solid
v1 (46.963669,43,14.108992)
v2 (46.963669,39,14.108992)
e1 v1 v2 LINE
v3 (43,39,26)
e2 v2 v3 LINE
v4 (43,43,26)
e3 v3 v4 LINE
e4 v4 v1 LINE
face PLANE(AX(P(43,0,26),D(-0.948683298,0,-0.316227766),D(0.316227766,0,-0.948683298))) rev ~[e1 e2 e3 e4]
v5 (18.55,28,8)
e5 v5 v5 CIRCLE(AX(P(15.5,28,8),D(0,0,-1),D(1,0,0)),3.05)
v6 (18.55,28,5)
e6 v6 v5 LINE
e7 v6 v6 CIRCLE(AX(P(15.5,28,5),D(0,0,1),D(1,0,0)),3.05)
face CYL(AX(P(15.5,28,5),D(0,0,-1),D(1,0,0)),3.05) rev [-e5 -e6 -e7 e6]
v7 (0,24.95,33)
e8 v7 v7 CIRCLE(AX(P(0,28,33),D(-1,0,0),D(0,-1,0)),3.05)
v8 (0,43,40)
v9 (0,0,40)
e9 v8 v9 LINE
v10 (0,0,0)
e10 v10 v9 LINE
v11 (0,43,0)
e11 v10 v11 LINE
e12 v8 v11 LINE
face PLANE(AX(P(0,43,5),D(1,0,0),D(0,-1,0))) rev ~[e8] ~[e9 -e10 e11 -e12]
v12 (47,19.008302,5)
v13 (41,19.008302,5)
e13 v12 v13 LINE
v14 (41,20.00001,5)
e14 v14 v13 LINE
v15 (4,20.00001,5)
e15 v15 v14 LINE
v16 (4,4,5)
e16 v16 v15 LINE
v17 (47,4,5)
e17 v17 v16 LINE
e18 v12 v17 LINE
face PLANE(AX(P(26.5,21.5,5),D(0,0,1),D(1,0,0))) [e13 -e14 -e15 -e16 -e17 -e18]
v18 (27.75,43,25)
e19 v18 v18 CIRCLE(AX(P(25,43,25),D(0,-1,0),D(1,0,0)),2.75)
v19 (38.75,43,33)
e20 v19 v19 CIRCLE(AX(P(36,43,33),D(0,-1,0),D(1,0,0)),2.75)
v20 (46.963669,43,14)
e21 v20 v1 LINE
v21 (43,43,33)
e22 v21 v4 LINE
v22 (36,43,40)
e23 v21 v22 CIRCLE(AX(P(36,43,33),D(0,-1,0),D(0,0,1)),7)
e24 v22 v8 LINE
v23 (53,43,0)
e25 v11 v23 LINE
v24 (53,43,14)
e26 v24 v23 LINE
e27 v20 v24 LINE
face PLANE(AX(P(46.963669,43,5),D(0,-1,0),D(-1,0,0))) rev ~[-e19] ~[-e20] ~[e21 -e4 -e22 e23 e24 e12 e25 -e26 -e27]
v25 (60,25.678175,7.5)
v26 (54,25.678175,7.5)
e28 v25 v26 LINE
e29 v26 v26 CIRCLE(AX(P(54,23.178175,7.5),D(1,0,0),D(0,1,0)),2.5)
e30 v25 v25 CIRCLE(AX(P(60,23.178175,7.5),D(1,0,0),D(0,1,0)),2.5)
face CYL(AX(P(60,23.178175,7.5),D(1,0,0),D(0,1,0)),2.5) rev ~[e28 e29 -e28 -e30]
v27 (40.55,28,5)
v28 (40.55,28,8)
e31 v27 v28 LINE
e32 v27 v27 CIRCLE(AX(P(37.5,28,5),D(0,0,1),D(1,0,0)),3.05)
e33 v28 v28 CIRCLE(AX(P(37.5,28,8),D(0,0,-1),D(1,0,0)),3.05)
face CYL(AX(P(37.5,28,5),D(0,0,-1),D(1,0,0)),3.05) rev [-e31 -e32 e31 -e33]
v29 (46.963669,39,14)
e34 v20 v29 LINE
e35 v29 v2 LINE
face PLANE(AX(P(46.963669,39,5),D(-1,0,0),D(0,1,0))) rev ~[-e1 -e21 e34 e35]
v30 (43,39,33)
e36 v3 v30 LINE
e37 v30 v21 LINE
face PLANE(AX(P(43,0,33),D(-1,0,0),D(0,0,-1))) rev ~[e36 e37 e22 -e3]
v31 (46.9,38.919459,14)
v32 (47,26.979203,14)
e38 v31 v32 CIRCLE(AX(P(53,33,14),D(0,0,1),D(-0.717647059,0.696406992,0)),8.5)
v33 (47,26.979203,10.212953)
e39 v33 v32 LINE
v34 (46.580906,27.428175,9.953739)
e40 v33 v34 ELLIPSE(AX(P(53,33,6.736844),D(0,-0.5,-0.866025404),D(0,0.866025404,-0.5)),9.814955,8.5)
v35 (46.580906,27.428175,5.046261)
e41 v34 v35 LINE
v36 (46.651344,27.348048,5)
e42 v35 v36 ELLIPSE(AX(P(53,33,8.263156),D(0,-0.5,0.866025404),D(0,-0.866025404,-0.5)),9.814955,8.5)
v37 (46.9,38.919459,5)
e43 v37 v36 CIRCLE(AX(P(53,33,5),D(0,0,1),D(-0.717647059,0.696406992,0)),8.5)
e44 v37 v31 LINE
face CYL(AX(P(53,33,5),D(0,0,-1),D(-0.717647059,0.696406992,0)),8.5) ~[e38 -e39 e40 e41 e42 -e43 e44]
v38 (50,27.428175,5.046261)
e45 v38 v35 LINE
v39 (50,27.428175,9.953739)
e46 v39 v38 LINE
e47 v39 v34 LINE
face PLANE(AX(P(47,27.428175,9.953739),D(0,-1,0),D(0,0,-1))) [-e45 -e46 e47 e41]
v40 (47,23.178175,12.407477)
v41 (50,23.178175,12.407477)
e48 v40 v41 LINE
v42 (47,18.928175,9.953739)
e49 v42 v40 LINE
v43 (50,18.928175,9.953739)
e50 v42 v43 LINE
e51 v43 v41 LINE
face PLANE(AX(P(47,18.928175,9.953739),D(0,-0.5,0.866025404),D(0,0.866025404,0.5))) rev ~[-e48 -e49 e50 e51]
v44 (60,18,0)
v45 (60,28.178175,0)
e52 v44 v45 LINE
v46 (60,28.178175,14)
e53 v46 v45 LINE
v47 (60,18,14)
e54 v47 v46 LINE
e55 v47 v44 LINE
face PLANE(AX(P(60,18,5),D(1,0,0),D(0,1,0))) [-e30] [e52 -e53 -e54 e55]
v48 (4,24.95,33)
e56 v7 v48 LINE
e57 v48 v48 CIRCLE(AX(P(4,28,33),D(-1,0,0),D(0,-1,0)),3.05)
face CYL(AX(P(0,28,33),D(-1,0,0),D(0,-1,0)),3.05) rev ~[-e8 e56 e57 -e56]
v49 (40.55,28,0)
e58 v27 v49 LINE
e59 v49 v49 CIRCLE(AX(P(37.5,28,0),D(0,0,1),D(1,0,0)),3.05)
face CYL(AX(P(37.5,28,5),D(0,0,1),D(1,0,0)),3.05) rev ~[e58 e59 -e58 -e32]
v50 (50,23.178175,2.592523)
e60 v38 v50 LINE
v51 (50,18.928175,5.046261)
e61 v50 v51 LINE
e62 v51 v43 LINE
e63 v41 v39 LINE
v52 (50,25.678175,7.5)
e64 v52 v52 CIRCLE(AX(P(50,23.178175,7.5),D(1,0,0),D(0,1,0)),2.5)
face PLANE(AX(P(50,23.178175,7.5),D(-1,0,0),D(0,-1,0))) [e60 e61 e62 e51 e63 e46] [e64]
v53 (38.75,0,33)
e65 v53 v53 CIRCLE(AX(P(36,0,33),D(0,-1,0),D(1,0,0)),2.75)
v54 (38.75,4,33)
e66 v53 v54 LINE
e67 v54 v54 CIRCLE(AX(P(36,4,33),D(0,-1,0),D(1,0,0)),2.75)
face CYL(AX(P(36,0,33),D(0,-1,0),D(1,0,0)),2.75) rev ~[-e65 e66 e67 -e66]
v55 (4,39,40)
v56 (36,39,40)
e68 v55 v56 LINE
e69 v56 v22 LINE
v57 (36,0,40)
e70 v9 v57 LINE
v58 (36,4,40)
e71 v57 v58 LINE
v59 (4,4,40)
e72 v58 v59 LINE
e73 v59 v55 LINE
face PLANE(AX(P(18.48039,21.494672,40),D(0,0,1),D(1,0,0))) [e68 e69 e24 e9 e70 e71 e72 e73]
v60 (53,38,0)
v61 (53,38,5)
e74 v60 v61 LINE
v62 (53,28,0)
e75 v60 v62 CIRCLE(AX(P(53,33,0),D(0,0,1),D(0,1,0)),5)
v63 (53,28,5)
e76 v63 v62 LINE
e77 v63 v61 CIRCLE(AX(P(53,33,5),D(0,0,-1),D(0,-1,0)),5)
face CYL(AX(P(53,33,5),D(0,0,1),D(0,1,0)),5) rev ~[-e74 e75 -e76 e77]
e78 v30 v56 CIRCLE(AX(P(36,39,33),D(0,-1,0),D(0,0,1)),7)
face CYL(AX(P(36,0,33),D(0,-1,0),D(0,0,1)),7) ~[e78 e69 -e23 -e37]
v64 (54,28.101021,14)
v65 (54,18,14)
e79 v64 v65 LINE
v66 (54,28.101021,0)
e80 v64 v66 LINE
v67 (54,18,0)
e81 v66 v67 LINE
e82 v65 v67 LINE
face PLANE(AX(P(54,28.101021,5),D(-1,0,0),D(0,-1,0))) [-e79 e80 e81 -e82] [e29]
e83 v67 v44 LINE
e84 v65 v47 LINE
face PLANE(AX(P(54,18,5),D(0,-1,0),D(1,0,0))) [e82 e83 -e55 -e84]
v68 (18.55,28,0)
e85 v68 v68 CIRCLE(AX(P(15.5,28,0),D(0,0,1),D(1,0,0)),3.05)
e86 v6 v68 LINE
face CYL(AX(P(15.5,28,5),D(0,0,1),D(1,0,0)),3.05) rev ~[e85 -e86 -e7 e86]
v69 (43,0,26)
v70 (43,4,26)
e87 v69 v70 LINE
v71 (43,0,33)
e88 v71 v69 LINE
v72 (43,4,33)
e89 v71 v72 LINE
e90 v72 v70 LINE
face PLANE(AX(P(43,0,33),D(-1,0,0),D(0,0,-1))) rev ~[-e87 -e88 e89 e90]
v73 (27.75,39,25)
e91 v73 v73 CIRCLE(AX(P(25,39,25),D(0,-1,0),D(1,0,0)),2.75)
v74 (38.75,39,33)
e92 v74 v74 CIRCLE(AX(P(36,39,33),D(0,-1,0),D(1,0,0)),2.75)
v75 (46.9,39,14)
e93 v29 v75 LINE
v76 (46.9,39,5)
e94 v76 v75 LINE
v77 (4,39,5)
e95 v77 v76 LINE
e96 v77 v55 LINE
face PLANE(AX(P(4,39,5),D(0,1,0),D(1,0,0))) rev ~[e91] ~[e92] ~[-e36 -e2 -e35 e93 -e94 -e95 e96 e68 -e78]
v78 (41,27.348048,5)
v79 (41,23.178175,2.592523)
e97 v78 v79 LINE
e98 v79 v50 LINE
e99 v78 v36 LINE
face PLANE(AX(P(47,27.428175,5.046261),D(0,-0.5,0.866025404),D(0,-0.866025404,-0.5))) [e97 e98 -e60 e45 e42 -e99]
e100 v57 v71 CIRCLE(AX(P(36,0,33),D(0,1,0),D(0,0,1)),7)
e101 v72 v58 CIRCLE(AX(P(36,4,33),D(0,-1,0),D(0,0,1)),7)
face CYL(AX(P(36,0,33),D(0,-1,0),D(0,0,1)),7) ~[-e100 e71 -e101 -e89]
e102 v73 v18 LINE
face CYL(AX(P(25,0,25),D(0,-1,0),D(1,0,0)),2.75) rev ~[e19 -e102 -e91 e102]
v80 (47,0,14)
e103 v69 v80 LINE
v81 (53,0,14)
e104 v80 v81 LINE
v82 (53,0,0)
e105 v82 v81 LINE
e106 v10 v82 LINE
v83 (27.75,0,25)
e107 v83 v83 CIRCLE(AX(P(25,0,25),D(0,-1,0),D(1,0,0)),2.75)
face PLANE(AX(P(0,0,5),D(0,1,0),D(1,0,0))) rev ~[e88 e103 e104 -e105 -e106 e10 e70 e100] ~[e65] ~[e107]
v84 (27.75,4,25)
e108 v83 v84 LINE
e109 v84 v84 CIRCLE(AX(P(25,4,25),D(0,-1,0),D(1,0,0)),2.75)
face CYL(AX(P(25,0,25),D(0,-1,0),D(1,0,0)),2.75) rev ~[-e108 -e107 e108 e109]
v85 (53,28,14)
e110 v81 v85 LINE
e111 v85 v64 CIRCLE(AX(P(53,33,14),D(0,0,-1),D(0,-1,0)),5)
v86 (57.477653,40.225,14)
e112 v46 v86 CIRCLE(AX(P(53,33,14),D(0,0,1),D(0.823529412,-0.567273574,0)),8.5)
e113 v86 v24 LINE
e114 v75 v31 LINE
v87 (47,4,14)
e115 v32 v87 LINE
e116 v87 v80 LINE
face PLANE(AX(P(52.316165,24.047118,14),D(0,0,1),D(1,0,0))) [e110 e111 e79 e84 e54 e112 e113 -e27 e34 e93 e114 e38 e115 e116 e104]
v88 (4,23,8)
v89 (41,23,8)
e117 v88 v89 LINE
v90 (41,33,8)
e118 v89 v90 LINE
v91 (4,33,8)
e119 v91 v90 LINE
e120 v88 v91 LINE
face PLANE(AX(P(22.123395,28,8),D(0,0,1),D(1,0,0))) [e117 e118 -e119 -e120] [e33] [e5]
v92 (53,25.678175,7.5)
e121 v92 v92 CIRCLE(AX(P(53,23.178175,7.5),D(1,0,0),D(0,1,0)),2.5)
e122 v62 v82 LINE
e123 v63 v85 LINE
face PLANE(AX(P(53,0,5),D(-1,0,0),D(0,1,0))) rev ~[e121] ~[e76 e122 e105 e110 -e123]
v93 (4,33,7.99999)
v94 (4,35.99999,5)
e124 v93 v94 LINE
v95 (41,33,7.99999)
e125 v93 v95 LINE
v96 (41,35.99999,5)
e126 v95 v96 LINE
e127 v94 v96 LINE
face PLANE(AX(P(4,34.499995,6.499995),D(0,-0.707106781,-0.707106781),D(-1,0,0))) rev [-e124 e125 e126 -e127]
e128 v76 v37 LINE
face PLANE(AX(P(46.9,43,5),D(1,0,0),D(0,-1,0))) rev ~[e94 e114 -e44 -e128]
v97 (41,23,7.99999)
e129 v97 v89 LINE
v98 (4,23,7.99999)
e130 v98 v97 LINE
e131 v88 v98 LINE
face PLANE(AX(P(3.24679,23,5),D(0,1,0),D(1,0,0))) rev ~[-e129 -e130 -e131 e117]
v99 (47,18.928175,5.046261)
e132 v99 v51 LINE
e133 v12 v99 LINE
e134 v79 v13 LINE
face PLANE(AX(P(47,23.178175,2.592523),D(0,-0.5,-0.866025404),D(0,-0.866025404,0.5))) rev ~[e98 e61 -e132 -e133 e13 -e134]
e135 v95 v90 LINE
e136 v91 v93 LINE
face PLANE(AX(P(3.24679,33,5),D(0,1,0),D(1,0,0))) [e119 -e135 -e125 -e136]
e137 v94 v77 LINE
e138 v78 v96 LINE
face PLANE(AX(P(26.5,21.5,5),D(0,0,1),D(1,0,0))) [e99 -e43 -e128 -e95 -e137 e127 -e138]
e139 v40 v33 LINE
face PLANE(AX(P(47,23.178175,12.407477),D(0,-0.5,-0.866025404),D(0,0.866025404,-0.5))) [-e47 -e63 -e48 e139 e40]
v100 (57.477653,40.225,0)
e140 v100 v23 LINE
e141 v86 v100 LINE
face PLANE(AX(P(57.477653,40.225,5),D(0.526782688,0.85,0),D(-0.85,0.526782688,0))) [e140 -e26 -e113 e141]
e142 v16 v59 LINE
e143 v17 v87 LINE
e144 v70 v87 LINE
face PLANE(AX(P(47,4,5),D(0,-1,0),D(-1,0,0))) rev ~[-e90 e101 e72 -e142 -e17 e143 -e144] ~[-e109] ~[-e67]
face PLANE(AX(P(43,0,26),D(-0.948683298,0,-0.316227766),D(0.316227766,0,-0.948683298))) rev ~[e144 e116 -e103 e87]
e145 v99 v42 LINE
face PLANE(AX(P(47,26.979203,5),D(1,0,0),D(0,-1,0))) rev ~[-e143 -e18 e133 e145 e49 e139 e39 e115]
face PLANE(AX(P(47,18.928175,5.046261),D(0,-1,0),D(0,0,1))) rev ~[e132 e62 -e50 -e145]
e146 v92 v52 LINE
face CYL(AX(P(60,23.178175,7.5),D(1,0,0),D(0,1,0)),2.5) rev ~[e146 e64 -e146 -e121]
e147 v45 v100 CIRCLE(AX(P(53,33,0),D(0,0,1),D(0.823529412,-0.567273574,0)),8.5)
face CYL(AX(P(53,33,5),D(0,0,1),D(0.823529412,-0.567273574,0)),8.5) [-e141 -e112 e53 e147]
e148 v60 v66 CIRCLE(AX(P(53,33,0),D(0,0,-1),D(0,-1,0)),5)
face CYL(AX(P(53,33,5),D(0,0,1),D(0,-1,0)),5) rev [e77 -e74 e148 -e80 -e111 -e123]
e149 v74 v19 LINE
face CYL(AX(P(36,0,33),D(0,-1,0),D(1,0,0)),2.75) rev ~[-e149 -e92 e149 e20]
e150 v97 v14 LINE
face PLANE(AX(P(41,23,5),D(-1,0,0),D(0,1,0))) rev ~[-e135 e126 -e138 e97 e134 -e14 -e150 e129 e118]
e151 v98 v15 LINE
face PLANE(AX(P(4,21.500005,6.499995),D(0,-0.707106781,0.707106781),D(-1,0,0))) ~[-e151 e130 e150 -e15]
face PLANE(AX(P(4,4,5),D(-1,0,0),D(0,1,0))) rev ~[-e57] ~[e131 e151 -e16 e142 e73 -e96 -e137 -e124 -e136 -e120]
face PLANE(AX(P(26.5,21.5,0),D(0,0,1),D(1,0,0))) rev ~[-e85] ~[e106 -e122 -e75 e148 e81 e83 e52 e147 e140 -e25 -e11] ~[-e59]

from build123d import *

# Parameters (mm, degrees)
F0_W           = 53
F0_H           = 43
F1_DEPTH       = 5
F3_DEPTH       = 9
F3_DEPTH_BACK  = 5
F4_DEPTH       = 25
F6_DEPTH       = 35
F7_R           = 2.75
F8_DEPTH       = 43.001
F10_DEPTH      = 3
F10_DEPTH_BACK = 6
F11_R          = 2.5
F12_DEPTH      = 25
F13_W          = 37.7532099868
F13_H          = 10
F14_DEPTH      = 3
F15_R          = 3.05
F16_DEPTH      = 25
F16_DEPTH_BACK = 25
F17_SIZE       = 2.99999
F18_R          = 3.05
F19_DEPTH      = 25


# Not quite as in the source:
# - a fillet or chamfer is up to 0.001 mm smaller than in the source, because OpenCascade refuses the exact size


with BuildPart() as f1:
    # F0 (on Top) → F1 (new body)
    with BuildSketch(Plane.XY):
        with Locations((26.5, 21.5)):
            Rectangle(F0_W, F0_H)
    extrude(amount=F1_DEPTH)

    # F2 (on face) → F3 (join, two sides)
    with BuildSketch(Plane.XY.offset(5)) as f3_sk:
        with BuildLine():
            Line((47, 0), (53, 0))
            Line((53, 0), (53, 24.5))
            Line((53, 24.5), (53, 28))
            ThreePointArc((53, 28), (52.49745519, 37.974680765), (54, 28.1010205144))
            Line((54, 28.1010205144), (54, 24.5590284919))
            Line((54, 24.5590284919), (54, 18))
            Line((54, 18), (60, 18))
            Line((60, 18), (60, 25.8046761155))
            Line((60, 25.8046761155), (60, 28.1781746195))
            ThreePointArc((60, 28.1781746195), (61.3195930877, 34.7419445616), (57.477652845, 40.225))
            Line((57.477652845, 40.225), (53, 43))
            Line((53, 43), (47, 43))
            Line((47, 43), (46.9, 43))
            Line((46.9, 43), (46.9, 38.9194594348))
            ThreePointArc((46.9, 38.9194594348), (44.5002980841, 32.9288147474), (47, 26.9792027106))
            Line((47, 26.9792027106), (47, 0))
        make_face()
    extrude(amount=F3_DEPTH)
    extrude(f3_sk.sketch, amount=-F3_DEPTH_BACK)

    # F2 (on face) → F4 (cut)
    with BuildSketch(Plane.XY.offset(5)):
        with BuildLine():
            ThreePointArc((53, 38), (48, 33), (53, 28))
            Line((53, 28), (53, 28.1010205144))
            Line((53, 28.1010205144), (53, 38))
        make_face()
    extrude(amount=-F4_DEPTH, mode=Mode.SUBTRACT)

    # F5 (on face) → F6 (join)
    with BuildSketch(Plane.XY.offset(5)):
        Polygon((0, 43), (0, 0), (47, 0), (47, 4.00000019), (4.00000019, 4.00000019), (4.00000019, 38.99999981), (46.9636693597, 38.99999981), (46.9636693597, 43), align=None)
    extrude(amount=F6_DEPTH)

    # F7 (on face) → F8 (cut, through all)
    with BuildSketch(Plane.XZ):
        with Locations((36, 33)):
            Circle(F7_R)
        with Locations((25, 25)):
            Circle(F7_R)
        with BuildLine():
            ThreePointArc((36, 40), (40.9497474683, 37.9497474683), (43, 33))
            Line((43, 33), (43, 26))
            Line((43, 26), (47, 14))
            Line((47, 14), (47, 40))
            Line((47, 40), (36, 40))
        make_face()
    extrude(amount=-F8_DEPTH, mode=Mode.SUBTRACT)

    # F9 (on face) → F10 (cut, two sides)
    with BuildSketch(Plane(origin=(47, 0, 0), x_dir=(0, -1, 0), z_dir=(-1, 0, 0))) as f10_sk:
        Polygon((-18.9281746195, 5.0462613559), (-18.9281746195, 9.9537386441), (-23.1781746195, 12.4074772881), (-27.4281746195, 9.9537386441), (-27.4281746195, 5.0462613559), (-23.1781746195, 2.5925227119), align=None)
    extrude(amount=-F10_DEPTH, mode=Mode.SUBTRACT)
    extrude(f10_sk.sketch, amount=F10_DEPTH_BACK, mode=Mode.SUBTRACT)

    # F11 (on face) → F12 (cut)
    with BuildSketch(Plane.YZ.offset(60)):
        with Locations((23.1781746195, 7.5)):
            Circle(F11_R)
    extrude(amount=-F12_DEPTH, mode=Mode.SUBTRACT)

    # F13 (on face) → F14 (join)
    with BuildSketch(Plane.XY.offset(5)):
        with Locations((22.1233950066, 28)):
            Rectangle(F13_W, F13_H)
    extrude(amount=F14_DEPTH)

    # F15 (on face) → F16 (cut, two sides)
    with BuildSketch(Plane.XY.offset(5)) as f16_sk:
        with Locations((15.5, 28)):
            Circle(F15_R)
        with Locations((37.5, 28)):
            Circle(F15_R)
    extrude(amount=-F16_DEPTH, mode=Mode.SUBTRACT)
    extrude(f16_sk.sketch, amount=F16_DEPTH_BACK, mode=Mode.SUBTRACT)

    # F17 (size 3 in the source; OpenCascade refuses exactly that, so slightly less here)
    f17_edges = [f1.edges().sort_by_distance(p)[0] for p in [
        (22.5, 23, 5),
        (22.5, 33, 5),
    ]]
    chamfer(f17_edges, length=F17_SIZE)

    # F18 (on face) → F19 (cut)
    with BuildSketch(Plane(origin=(0, 0, 0), x_dir=(0, -1, 0), z_dir=(-1, 0, 0))):
        with Locations((-28, 33)):
            Circle(F18_R)
    extrude(amount=-F19_DEPTH, mode=Mode.SUBTRACT)


solid = f1.part
